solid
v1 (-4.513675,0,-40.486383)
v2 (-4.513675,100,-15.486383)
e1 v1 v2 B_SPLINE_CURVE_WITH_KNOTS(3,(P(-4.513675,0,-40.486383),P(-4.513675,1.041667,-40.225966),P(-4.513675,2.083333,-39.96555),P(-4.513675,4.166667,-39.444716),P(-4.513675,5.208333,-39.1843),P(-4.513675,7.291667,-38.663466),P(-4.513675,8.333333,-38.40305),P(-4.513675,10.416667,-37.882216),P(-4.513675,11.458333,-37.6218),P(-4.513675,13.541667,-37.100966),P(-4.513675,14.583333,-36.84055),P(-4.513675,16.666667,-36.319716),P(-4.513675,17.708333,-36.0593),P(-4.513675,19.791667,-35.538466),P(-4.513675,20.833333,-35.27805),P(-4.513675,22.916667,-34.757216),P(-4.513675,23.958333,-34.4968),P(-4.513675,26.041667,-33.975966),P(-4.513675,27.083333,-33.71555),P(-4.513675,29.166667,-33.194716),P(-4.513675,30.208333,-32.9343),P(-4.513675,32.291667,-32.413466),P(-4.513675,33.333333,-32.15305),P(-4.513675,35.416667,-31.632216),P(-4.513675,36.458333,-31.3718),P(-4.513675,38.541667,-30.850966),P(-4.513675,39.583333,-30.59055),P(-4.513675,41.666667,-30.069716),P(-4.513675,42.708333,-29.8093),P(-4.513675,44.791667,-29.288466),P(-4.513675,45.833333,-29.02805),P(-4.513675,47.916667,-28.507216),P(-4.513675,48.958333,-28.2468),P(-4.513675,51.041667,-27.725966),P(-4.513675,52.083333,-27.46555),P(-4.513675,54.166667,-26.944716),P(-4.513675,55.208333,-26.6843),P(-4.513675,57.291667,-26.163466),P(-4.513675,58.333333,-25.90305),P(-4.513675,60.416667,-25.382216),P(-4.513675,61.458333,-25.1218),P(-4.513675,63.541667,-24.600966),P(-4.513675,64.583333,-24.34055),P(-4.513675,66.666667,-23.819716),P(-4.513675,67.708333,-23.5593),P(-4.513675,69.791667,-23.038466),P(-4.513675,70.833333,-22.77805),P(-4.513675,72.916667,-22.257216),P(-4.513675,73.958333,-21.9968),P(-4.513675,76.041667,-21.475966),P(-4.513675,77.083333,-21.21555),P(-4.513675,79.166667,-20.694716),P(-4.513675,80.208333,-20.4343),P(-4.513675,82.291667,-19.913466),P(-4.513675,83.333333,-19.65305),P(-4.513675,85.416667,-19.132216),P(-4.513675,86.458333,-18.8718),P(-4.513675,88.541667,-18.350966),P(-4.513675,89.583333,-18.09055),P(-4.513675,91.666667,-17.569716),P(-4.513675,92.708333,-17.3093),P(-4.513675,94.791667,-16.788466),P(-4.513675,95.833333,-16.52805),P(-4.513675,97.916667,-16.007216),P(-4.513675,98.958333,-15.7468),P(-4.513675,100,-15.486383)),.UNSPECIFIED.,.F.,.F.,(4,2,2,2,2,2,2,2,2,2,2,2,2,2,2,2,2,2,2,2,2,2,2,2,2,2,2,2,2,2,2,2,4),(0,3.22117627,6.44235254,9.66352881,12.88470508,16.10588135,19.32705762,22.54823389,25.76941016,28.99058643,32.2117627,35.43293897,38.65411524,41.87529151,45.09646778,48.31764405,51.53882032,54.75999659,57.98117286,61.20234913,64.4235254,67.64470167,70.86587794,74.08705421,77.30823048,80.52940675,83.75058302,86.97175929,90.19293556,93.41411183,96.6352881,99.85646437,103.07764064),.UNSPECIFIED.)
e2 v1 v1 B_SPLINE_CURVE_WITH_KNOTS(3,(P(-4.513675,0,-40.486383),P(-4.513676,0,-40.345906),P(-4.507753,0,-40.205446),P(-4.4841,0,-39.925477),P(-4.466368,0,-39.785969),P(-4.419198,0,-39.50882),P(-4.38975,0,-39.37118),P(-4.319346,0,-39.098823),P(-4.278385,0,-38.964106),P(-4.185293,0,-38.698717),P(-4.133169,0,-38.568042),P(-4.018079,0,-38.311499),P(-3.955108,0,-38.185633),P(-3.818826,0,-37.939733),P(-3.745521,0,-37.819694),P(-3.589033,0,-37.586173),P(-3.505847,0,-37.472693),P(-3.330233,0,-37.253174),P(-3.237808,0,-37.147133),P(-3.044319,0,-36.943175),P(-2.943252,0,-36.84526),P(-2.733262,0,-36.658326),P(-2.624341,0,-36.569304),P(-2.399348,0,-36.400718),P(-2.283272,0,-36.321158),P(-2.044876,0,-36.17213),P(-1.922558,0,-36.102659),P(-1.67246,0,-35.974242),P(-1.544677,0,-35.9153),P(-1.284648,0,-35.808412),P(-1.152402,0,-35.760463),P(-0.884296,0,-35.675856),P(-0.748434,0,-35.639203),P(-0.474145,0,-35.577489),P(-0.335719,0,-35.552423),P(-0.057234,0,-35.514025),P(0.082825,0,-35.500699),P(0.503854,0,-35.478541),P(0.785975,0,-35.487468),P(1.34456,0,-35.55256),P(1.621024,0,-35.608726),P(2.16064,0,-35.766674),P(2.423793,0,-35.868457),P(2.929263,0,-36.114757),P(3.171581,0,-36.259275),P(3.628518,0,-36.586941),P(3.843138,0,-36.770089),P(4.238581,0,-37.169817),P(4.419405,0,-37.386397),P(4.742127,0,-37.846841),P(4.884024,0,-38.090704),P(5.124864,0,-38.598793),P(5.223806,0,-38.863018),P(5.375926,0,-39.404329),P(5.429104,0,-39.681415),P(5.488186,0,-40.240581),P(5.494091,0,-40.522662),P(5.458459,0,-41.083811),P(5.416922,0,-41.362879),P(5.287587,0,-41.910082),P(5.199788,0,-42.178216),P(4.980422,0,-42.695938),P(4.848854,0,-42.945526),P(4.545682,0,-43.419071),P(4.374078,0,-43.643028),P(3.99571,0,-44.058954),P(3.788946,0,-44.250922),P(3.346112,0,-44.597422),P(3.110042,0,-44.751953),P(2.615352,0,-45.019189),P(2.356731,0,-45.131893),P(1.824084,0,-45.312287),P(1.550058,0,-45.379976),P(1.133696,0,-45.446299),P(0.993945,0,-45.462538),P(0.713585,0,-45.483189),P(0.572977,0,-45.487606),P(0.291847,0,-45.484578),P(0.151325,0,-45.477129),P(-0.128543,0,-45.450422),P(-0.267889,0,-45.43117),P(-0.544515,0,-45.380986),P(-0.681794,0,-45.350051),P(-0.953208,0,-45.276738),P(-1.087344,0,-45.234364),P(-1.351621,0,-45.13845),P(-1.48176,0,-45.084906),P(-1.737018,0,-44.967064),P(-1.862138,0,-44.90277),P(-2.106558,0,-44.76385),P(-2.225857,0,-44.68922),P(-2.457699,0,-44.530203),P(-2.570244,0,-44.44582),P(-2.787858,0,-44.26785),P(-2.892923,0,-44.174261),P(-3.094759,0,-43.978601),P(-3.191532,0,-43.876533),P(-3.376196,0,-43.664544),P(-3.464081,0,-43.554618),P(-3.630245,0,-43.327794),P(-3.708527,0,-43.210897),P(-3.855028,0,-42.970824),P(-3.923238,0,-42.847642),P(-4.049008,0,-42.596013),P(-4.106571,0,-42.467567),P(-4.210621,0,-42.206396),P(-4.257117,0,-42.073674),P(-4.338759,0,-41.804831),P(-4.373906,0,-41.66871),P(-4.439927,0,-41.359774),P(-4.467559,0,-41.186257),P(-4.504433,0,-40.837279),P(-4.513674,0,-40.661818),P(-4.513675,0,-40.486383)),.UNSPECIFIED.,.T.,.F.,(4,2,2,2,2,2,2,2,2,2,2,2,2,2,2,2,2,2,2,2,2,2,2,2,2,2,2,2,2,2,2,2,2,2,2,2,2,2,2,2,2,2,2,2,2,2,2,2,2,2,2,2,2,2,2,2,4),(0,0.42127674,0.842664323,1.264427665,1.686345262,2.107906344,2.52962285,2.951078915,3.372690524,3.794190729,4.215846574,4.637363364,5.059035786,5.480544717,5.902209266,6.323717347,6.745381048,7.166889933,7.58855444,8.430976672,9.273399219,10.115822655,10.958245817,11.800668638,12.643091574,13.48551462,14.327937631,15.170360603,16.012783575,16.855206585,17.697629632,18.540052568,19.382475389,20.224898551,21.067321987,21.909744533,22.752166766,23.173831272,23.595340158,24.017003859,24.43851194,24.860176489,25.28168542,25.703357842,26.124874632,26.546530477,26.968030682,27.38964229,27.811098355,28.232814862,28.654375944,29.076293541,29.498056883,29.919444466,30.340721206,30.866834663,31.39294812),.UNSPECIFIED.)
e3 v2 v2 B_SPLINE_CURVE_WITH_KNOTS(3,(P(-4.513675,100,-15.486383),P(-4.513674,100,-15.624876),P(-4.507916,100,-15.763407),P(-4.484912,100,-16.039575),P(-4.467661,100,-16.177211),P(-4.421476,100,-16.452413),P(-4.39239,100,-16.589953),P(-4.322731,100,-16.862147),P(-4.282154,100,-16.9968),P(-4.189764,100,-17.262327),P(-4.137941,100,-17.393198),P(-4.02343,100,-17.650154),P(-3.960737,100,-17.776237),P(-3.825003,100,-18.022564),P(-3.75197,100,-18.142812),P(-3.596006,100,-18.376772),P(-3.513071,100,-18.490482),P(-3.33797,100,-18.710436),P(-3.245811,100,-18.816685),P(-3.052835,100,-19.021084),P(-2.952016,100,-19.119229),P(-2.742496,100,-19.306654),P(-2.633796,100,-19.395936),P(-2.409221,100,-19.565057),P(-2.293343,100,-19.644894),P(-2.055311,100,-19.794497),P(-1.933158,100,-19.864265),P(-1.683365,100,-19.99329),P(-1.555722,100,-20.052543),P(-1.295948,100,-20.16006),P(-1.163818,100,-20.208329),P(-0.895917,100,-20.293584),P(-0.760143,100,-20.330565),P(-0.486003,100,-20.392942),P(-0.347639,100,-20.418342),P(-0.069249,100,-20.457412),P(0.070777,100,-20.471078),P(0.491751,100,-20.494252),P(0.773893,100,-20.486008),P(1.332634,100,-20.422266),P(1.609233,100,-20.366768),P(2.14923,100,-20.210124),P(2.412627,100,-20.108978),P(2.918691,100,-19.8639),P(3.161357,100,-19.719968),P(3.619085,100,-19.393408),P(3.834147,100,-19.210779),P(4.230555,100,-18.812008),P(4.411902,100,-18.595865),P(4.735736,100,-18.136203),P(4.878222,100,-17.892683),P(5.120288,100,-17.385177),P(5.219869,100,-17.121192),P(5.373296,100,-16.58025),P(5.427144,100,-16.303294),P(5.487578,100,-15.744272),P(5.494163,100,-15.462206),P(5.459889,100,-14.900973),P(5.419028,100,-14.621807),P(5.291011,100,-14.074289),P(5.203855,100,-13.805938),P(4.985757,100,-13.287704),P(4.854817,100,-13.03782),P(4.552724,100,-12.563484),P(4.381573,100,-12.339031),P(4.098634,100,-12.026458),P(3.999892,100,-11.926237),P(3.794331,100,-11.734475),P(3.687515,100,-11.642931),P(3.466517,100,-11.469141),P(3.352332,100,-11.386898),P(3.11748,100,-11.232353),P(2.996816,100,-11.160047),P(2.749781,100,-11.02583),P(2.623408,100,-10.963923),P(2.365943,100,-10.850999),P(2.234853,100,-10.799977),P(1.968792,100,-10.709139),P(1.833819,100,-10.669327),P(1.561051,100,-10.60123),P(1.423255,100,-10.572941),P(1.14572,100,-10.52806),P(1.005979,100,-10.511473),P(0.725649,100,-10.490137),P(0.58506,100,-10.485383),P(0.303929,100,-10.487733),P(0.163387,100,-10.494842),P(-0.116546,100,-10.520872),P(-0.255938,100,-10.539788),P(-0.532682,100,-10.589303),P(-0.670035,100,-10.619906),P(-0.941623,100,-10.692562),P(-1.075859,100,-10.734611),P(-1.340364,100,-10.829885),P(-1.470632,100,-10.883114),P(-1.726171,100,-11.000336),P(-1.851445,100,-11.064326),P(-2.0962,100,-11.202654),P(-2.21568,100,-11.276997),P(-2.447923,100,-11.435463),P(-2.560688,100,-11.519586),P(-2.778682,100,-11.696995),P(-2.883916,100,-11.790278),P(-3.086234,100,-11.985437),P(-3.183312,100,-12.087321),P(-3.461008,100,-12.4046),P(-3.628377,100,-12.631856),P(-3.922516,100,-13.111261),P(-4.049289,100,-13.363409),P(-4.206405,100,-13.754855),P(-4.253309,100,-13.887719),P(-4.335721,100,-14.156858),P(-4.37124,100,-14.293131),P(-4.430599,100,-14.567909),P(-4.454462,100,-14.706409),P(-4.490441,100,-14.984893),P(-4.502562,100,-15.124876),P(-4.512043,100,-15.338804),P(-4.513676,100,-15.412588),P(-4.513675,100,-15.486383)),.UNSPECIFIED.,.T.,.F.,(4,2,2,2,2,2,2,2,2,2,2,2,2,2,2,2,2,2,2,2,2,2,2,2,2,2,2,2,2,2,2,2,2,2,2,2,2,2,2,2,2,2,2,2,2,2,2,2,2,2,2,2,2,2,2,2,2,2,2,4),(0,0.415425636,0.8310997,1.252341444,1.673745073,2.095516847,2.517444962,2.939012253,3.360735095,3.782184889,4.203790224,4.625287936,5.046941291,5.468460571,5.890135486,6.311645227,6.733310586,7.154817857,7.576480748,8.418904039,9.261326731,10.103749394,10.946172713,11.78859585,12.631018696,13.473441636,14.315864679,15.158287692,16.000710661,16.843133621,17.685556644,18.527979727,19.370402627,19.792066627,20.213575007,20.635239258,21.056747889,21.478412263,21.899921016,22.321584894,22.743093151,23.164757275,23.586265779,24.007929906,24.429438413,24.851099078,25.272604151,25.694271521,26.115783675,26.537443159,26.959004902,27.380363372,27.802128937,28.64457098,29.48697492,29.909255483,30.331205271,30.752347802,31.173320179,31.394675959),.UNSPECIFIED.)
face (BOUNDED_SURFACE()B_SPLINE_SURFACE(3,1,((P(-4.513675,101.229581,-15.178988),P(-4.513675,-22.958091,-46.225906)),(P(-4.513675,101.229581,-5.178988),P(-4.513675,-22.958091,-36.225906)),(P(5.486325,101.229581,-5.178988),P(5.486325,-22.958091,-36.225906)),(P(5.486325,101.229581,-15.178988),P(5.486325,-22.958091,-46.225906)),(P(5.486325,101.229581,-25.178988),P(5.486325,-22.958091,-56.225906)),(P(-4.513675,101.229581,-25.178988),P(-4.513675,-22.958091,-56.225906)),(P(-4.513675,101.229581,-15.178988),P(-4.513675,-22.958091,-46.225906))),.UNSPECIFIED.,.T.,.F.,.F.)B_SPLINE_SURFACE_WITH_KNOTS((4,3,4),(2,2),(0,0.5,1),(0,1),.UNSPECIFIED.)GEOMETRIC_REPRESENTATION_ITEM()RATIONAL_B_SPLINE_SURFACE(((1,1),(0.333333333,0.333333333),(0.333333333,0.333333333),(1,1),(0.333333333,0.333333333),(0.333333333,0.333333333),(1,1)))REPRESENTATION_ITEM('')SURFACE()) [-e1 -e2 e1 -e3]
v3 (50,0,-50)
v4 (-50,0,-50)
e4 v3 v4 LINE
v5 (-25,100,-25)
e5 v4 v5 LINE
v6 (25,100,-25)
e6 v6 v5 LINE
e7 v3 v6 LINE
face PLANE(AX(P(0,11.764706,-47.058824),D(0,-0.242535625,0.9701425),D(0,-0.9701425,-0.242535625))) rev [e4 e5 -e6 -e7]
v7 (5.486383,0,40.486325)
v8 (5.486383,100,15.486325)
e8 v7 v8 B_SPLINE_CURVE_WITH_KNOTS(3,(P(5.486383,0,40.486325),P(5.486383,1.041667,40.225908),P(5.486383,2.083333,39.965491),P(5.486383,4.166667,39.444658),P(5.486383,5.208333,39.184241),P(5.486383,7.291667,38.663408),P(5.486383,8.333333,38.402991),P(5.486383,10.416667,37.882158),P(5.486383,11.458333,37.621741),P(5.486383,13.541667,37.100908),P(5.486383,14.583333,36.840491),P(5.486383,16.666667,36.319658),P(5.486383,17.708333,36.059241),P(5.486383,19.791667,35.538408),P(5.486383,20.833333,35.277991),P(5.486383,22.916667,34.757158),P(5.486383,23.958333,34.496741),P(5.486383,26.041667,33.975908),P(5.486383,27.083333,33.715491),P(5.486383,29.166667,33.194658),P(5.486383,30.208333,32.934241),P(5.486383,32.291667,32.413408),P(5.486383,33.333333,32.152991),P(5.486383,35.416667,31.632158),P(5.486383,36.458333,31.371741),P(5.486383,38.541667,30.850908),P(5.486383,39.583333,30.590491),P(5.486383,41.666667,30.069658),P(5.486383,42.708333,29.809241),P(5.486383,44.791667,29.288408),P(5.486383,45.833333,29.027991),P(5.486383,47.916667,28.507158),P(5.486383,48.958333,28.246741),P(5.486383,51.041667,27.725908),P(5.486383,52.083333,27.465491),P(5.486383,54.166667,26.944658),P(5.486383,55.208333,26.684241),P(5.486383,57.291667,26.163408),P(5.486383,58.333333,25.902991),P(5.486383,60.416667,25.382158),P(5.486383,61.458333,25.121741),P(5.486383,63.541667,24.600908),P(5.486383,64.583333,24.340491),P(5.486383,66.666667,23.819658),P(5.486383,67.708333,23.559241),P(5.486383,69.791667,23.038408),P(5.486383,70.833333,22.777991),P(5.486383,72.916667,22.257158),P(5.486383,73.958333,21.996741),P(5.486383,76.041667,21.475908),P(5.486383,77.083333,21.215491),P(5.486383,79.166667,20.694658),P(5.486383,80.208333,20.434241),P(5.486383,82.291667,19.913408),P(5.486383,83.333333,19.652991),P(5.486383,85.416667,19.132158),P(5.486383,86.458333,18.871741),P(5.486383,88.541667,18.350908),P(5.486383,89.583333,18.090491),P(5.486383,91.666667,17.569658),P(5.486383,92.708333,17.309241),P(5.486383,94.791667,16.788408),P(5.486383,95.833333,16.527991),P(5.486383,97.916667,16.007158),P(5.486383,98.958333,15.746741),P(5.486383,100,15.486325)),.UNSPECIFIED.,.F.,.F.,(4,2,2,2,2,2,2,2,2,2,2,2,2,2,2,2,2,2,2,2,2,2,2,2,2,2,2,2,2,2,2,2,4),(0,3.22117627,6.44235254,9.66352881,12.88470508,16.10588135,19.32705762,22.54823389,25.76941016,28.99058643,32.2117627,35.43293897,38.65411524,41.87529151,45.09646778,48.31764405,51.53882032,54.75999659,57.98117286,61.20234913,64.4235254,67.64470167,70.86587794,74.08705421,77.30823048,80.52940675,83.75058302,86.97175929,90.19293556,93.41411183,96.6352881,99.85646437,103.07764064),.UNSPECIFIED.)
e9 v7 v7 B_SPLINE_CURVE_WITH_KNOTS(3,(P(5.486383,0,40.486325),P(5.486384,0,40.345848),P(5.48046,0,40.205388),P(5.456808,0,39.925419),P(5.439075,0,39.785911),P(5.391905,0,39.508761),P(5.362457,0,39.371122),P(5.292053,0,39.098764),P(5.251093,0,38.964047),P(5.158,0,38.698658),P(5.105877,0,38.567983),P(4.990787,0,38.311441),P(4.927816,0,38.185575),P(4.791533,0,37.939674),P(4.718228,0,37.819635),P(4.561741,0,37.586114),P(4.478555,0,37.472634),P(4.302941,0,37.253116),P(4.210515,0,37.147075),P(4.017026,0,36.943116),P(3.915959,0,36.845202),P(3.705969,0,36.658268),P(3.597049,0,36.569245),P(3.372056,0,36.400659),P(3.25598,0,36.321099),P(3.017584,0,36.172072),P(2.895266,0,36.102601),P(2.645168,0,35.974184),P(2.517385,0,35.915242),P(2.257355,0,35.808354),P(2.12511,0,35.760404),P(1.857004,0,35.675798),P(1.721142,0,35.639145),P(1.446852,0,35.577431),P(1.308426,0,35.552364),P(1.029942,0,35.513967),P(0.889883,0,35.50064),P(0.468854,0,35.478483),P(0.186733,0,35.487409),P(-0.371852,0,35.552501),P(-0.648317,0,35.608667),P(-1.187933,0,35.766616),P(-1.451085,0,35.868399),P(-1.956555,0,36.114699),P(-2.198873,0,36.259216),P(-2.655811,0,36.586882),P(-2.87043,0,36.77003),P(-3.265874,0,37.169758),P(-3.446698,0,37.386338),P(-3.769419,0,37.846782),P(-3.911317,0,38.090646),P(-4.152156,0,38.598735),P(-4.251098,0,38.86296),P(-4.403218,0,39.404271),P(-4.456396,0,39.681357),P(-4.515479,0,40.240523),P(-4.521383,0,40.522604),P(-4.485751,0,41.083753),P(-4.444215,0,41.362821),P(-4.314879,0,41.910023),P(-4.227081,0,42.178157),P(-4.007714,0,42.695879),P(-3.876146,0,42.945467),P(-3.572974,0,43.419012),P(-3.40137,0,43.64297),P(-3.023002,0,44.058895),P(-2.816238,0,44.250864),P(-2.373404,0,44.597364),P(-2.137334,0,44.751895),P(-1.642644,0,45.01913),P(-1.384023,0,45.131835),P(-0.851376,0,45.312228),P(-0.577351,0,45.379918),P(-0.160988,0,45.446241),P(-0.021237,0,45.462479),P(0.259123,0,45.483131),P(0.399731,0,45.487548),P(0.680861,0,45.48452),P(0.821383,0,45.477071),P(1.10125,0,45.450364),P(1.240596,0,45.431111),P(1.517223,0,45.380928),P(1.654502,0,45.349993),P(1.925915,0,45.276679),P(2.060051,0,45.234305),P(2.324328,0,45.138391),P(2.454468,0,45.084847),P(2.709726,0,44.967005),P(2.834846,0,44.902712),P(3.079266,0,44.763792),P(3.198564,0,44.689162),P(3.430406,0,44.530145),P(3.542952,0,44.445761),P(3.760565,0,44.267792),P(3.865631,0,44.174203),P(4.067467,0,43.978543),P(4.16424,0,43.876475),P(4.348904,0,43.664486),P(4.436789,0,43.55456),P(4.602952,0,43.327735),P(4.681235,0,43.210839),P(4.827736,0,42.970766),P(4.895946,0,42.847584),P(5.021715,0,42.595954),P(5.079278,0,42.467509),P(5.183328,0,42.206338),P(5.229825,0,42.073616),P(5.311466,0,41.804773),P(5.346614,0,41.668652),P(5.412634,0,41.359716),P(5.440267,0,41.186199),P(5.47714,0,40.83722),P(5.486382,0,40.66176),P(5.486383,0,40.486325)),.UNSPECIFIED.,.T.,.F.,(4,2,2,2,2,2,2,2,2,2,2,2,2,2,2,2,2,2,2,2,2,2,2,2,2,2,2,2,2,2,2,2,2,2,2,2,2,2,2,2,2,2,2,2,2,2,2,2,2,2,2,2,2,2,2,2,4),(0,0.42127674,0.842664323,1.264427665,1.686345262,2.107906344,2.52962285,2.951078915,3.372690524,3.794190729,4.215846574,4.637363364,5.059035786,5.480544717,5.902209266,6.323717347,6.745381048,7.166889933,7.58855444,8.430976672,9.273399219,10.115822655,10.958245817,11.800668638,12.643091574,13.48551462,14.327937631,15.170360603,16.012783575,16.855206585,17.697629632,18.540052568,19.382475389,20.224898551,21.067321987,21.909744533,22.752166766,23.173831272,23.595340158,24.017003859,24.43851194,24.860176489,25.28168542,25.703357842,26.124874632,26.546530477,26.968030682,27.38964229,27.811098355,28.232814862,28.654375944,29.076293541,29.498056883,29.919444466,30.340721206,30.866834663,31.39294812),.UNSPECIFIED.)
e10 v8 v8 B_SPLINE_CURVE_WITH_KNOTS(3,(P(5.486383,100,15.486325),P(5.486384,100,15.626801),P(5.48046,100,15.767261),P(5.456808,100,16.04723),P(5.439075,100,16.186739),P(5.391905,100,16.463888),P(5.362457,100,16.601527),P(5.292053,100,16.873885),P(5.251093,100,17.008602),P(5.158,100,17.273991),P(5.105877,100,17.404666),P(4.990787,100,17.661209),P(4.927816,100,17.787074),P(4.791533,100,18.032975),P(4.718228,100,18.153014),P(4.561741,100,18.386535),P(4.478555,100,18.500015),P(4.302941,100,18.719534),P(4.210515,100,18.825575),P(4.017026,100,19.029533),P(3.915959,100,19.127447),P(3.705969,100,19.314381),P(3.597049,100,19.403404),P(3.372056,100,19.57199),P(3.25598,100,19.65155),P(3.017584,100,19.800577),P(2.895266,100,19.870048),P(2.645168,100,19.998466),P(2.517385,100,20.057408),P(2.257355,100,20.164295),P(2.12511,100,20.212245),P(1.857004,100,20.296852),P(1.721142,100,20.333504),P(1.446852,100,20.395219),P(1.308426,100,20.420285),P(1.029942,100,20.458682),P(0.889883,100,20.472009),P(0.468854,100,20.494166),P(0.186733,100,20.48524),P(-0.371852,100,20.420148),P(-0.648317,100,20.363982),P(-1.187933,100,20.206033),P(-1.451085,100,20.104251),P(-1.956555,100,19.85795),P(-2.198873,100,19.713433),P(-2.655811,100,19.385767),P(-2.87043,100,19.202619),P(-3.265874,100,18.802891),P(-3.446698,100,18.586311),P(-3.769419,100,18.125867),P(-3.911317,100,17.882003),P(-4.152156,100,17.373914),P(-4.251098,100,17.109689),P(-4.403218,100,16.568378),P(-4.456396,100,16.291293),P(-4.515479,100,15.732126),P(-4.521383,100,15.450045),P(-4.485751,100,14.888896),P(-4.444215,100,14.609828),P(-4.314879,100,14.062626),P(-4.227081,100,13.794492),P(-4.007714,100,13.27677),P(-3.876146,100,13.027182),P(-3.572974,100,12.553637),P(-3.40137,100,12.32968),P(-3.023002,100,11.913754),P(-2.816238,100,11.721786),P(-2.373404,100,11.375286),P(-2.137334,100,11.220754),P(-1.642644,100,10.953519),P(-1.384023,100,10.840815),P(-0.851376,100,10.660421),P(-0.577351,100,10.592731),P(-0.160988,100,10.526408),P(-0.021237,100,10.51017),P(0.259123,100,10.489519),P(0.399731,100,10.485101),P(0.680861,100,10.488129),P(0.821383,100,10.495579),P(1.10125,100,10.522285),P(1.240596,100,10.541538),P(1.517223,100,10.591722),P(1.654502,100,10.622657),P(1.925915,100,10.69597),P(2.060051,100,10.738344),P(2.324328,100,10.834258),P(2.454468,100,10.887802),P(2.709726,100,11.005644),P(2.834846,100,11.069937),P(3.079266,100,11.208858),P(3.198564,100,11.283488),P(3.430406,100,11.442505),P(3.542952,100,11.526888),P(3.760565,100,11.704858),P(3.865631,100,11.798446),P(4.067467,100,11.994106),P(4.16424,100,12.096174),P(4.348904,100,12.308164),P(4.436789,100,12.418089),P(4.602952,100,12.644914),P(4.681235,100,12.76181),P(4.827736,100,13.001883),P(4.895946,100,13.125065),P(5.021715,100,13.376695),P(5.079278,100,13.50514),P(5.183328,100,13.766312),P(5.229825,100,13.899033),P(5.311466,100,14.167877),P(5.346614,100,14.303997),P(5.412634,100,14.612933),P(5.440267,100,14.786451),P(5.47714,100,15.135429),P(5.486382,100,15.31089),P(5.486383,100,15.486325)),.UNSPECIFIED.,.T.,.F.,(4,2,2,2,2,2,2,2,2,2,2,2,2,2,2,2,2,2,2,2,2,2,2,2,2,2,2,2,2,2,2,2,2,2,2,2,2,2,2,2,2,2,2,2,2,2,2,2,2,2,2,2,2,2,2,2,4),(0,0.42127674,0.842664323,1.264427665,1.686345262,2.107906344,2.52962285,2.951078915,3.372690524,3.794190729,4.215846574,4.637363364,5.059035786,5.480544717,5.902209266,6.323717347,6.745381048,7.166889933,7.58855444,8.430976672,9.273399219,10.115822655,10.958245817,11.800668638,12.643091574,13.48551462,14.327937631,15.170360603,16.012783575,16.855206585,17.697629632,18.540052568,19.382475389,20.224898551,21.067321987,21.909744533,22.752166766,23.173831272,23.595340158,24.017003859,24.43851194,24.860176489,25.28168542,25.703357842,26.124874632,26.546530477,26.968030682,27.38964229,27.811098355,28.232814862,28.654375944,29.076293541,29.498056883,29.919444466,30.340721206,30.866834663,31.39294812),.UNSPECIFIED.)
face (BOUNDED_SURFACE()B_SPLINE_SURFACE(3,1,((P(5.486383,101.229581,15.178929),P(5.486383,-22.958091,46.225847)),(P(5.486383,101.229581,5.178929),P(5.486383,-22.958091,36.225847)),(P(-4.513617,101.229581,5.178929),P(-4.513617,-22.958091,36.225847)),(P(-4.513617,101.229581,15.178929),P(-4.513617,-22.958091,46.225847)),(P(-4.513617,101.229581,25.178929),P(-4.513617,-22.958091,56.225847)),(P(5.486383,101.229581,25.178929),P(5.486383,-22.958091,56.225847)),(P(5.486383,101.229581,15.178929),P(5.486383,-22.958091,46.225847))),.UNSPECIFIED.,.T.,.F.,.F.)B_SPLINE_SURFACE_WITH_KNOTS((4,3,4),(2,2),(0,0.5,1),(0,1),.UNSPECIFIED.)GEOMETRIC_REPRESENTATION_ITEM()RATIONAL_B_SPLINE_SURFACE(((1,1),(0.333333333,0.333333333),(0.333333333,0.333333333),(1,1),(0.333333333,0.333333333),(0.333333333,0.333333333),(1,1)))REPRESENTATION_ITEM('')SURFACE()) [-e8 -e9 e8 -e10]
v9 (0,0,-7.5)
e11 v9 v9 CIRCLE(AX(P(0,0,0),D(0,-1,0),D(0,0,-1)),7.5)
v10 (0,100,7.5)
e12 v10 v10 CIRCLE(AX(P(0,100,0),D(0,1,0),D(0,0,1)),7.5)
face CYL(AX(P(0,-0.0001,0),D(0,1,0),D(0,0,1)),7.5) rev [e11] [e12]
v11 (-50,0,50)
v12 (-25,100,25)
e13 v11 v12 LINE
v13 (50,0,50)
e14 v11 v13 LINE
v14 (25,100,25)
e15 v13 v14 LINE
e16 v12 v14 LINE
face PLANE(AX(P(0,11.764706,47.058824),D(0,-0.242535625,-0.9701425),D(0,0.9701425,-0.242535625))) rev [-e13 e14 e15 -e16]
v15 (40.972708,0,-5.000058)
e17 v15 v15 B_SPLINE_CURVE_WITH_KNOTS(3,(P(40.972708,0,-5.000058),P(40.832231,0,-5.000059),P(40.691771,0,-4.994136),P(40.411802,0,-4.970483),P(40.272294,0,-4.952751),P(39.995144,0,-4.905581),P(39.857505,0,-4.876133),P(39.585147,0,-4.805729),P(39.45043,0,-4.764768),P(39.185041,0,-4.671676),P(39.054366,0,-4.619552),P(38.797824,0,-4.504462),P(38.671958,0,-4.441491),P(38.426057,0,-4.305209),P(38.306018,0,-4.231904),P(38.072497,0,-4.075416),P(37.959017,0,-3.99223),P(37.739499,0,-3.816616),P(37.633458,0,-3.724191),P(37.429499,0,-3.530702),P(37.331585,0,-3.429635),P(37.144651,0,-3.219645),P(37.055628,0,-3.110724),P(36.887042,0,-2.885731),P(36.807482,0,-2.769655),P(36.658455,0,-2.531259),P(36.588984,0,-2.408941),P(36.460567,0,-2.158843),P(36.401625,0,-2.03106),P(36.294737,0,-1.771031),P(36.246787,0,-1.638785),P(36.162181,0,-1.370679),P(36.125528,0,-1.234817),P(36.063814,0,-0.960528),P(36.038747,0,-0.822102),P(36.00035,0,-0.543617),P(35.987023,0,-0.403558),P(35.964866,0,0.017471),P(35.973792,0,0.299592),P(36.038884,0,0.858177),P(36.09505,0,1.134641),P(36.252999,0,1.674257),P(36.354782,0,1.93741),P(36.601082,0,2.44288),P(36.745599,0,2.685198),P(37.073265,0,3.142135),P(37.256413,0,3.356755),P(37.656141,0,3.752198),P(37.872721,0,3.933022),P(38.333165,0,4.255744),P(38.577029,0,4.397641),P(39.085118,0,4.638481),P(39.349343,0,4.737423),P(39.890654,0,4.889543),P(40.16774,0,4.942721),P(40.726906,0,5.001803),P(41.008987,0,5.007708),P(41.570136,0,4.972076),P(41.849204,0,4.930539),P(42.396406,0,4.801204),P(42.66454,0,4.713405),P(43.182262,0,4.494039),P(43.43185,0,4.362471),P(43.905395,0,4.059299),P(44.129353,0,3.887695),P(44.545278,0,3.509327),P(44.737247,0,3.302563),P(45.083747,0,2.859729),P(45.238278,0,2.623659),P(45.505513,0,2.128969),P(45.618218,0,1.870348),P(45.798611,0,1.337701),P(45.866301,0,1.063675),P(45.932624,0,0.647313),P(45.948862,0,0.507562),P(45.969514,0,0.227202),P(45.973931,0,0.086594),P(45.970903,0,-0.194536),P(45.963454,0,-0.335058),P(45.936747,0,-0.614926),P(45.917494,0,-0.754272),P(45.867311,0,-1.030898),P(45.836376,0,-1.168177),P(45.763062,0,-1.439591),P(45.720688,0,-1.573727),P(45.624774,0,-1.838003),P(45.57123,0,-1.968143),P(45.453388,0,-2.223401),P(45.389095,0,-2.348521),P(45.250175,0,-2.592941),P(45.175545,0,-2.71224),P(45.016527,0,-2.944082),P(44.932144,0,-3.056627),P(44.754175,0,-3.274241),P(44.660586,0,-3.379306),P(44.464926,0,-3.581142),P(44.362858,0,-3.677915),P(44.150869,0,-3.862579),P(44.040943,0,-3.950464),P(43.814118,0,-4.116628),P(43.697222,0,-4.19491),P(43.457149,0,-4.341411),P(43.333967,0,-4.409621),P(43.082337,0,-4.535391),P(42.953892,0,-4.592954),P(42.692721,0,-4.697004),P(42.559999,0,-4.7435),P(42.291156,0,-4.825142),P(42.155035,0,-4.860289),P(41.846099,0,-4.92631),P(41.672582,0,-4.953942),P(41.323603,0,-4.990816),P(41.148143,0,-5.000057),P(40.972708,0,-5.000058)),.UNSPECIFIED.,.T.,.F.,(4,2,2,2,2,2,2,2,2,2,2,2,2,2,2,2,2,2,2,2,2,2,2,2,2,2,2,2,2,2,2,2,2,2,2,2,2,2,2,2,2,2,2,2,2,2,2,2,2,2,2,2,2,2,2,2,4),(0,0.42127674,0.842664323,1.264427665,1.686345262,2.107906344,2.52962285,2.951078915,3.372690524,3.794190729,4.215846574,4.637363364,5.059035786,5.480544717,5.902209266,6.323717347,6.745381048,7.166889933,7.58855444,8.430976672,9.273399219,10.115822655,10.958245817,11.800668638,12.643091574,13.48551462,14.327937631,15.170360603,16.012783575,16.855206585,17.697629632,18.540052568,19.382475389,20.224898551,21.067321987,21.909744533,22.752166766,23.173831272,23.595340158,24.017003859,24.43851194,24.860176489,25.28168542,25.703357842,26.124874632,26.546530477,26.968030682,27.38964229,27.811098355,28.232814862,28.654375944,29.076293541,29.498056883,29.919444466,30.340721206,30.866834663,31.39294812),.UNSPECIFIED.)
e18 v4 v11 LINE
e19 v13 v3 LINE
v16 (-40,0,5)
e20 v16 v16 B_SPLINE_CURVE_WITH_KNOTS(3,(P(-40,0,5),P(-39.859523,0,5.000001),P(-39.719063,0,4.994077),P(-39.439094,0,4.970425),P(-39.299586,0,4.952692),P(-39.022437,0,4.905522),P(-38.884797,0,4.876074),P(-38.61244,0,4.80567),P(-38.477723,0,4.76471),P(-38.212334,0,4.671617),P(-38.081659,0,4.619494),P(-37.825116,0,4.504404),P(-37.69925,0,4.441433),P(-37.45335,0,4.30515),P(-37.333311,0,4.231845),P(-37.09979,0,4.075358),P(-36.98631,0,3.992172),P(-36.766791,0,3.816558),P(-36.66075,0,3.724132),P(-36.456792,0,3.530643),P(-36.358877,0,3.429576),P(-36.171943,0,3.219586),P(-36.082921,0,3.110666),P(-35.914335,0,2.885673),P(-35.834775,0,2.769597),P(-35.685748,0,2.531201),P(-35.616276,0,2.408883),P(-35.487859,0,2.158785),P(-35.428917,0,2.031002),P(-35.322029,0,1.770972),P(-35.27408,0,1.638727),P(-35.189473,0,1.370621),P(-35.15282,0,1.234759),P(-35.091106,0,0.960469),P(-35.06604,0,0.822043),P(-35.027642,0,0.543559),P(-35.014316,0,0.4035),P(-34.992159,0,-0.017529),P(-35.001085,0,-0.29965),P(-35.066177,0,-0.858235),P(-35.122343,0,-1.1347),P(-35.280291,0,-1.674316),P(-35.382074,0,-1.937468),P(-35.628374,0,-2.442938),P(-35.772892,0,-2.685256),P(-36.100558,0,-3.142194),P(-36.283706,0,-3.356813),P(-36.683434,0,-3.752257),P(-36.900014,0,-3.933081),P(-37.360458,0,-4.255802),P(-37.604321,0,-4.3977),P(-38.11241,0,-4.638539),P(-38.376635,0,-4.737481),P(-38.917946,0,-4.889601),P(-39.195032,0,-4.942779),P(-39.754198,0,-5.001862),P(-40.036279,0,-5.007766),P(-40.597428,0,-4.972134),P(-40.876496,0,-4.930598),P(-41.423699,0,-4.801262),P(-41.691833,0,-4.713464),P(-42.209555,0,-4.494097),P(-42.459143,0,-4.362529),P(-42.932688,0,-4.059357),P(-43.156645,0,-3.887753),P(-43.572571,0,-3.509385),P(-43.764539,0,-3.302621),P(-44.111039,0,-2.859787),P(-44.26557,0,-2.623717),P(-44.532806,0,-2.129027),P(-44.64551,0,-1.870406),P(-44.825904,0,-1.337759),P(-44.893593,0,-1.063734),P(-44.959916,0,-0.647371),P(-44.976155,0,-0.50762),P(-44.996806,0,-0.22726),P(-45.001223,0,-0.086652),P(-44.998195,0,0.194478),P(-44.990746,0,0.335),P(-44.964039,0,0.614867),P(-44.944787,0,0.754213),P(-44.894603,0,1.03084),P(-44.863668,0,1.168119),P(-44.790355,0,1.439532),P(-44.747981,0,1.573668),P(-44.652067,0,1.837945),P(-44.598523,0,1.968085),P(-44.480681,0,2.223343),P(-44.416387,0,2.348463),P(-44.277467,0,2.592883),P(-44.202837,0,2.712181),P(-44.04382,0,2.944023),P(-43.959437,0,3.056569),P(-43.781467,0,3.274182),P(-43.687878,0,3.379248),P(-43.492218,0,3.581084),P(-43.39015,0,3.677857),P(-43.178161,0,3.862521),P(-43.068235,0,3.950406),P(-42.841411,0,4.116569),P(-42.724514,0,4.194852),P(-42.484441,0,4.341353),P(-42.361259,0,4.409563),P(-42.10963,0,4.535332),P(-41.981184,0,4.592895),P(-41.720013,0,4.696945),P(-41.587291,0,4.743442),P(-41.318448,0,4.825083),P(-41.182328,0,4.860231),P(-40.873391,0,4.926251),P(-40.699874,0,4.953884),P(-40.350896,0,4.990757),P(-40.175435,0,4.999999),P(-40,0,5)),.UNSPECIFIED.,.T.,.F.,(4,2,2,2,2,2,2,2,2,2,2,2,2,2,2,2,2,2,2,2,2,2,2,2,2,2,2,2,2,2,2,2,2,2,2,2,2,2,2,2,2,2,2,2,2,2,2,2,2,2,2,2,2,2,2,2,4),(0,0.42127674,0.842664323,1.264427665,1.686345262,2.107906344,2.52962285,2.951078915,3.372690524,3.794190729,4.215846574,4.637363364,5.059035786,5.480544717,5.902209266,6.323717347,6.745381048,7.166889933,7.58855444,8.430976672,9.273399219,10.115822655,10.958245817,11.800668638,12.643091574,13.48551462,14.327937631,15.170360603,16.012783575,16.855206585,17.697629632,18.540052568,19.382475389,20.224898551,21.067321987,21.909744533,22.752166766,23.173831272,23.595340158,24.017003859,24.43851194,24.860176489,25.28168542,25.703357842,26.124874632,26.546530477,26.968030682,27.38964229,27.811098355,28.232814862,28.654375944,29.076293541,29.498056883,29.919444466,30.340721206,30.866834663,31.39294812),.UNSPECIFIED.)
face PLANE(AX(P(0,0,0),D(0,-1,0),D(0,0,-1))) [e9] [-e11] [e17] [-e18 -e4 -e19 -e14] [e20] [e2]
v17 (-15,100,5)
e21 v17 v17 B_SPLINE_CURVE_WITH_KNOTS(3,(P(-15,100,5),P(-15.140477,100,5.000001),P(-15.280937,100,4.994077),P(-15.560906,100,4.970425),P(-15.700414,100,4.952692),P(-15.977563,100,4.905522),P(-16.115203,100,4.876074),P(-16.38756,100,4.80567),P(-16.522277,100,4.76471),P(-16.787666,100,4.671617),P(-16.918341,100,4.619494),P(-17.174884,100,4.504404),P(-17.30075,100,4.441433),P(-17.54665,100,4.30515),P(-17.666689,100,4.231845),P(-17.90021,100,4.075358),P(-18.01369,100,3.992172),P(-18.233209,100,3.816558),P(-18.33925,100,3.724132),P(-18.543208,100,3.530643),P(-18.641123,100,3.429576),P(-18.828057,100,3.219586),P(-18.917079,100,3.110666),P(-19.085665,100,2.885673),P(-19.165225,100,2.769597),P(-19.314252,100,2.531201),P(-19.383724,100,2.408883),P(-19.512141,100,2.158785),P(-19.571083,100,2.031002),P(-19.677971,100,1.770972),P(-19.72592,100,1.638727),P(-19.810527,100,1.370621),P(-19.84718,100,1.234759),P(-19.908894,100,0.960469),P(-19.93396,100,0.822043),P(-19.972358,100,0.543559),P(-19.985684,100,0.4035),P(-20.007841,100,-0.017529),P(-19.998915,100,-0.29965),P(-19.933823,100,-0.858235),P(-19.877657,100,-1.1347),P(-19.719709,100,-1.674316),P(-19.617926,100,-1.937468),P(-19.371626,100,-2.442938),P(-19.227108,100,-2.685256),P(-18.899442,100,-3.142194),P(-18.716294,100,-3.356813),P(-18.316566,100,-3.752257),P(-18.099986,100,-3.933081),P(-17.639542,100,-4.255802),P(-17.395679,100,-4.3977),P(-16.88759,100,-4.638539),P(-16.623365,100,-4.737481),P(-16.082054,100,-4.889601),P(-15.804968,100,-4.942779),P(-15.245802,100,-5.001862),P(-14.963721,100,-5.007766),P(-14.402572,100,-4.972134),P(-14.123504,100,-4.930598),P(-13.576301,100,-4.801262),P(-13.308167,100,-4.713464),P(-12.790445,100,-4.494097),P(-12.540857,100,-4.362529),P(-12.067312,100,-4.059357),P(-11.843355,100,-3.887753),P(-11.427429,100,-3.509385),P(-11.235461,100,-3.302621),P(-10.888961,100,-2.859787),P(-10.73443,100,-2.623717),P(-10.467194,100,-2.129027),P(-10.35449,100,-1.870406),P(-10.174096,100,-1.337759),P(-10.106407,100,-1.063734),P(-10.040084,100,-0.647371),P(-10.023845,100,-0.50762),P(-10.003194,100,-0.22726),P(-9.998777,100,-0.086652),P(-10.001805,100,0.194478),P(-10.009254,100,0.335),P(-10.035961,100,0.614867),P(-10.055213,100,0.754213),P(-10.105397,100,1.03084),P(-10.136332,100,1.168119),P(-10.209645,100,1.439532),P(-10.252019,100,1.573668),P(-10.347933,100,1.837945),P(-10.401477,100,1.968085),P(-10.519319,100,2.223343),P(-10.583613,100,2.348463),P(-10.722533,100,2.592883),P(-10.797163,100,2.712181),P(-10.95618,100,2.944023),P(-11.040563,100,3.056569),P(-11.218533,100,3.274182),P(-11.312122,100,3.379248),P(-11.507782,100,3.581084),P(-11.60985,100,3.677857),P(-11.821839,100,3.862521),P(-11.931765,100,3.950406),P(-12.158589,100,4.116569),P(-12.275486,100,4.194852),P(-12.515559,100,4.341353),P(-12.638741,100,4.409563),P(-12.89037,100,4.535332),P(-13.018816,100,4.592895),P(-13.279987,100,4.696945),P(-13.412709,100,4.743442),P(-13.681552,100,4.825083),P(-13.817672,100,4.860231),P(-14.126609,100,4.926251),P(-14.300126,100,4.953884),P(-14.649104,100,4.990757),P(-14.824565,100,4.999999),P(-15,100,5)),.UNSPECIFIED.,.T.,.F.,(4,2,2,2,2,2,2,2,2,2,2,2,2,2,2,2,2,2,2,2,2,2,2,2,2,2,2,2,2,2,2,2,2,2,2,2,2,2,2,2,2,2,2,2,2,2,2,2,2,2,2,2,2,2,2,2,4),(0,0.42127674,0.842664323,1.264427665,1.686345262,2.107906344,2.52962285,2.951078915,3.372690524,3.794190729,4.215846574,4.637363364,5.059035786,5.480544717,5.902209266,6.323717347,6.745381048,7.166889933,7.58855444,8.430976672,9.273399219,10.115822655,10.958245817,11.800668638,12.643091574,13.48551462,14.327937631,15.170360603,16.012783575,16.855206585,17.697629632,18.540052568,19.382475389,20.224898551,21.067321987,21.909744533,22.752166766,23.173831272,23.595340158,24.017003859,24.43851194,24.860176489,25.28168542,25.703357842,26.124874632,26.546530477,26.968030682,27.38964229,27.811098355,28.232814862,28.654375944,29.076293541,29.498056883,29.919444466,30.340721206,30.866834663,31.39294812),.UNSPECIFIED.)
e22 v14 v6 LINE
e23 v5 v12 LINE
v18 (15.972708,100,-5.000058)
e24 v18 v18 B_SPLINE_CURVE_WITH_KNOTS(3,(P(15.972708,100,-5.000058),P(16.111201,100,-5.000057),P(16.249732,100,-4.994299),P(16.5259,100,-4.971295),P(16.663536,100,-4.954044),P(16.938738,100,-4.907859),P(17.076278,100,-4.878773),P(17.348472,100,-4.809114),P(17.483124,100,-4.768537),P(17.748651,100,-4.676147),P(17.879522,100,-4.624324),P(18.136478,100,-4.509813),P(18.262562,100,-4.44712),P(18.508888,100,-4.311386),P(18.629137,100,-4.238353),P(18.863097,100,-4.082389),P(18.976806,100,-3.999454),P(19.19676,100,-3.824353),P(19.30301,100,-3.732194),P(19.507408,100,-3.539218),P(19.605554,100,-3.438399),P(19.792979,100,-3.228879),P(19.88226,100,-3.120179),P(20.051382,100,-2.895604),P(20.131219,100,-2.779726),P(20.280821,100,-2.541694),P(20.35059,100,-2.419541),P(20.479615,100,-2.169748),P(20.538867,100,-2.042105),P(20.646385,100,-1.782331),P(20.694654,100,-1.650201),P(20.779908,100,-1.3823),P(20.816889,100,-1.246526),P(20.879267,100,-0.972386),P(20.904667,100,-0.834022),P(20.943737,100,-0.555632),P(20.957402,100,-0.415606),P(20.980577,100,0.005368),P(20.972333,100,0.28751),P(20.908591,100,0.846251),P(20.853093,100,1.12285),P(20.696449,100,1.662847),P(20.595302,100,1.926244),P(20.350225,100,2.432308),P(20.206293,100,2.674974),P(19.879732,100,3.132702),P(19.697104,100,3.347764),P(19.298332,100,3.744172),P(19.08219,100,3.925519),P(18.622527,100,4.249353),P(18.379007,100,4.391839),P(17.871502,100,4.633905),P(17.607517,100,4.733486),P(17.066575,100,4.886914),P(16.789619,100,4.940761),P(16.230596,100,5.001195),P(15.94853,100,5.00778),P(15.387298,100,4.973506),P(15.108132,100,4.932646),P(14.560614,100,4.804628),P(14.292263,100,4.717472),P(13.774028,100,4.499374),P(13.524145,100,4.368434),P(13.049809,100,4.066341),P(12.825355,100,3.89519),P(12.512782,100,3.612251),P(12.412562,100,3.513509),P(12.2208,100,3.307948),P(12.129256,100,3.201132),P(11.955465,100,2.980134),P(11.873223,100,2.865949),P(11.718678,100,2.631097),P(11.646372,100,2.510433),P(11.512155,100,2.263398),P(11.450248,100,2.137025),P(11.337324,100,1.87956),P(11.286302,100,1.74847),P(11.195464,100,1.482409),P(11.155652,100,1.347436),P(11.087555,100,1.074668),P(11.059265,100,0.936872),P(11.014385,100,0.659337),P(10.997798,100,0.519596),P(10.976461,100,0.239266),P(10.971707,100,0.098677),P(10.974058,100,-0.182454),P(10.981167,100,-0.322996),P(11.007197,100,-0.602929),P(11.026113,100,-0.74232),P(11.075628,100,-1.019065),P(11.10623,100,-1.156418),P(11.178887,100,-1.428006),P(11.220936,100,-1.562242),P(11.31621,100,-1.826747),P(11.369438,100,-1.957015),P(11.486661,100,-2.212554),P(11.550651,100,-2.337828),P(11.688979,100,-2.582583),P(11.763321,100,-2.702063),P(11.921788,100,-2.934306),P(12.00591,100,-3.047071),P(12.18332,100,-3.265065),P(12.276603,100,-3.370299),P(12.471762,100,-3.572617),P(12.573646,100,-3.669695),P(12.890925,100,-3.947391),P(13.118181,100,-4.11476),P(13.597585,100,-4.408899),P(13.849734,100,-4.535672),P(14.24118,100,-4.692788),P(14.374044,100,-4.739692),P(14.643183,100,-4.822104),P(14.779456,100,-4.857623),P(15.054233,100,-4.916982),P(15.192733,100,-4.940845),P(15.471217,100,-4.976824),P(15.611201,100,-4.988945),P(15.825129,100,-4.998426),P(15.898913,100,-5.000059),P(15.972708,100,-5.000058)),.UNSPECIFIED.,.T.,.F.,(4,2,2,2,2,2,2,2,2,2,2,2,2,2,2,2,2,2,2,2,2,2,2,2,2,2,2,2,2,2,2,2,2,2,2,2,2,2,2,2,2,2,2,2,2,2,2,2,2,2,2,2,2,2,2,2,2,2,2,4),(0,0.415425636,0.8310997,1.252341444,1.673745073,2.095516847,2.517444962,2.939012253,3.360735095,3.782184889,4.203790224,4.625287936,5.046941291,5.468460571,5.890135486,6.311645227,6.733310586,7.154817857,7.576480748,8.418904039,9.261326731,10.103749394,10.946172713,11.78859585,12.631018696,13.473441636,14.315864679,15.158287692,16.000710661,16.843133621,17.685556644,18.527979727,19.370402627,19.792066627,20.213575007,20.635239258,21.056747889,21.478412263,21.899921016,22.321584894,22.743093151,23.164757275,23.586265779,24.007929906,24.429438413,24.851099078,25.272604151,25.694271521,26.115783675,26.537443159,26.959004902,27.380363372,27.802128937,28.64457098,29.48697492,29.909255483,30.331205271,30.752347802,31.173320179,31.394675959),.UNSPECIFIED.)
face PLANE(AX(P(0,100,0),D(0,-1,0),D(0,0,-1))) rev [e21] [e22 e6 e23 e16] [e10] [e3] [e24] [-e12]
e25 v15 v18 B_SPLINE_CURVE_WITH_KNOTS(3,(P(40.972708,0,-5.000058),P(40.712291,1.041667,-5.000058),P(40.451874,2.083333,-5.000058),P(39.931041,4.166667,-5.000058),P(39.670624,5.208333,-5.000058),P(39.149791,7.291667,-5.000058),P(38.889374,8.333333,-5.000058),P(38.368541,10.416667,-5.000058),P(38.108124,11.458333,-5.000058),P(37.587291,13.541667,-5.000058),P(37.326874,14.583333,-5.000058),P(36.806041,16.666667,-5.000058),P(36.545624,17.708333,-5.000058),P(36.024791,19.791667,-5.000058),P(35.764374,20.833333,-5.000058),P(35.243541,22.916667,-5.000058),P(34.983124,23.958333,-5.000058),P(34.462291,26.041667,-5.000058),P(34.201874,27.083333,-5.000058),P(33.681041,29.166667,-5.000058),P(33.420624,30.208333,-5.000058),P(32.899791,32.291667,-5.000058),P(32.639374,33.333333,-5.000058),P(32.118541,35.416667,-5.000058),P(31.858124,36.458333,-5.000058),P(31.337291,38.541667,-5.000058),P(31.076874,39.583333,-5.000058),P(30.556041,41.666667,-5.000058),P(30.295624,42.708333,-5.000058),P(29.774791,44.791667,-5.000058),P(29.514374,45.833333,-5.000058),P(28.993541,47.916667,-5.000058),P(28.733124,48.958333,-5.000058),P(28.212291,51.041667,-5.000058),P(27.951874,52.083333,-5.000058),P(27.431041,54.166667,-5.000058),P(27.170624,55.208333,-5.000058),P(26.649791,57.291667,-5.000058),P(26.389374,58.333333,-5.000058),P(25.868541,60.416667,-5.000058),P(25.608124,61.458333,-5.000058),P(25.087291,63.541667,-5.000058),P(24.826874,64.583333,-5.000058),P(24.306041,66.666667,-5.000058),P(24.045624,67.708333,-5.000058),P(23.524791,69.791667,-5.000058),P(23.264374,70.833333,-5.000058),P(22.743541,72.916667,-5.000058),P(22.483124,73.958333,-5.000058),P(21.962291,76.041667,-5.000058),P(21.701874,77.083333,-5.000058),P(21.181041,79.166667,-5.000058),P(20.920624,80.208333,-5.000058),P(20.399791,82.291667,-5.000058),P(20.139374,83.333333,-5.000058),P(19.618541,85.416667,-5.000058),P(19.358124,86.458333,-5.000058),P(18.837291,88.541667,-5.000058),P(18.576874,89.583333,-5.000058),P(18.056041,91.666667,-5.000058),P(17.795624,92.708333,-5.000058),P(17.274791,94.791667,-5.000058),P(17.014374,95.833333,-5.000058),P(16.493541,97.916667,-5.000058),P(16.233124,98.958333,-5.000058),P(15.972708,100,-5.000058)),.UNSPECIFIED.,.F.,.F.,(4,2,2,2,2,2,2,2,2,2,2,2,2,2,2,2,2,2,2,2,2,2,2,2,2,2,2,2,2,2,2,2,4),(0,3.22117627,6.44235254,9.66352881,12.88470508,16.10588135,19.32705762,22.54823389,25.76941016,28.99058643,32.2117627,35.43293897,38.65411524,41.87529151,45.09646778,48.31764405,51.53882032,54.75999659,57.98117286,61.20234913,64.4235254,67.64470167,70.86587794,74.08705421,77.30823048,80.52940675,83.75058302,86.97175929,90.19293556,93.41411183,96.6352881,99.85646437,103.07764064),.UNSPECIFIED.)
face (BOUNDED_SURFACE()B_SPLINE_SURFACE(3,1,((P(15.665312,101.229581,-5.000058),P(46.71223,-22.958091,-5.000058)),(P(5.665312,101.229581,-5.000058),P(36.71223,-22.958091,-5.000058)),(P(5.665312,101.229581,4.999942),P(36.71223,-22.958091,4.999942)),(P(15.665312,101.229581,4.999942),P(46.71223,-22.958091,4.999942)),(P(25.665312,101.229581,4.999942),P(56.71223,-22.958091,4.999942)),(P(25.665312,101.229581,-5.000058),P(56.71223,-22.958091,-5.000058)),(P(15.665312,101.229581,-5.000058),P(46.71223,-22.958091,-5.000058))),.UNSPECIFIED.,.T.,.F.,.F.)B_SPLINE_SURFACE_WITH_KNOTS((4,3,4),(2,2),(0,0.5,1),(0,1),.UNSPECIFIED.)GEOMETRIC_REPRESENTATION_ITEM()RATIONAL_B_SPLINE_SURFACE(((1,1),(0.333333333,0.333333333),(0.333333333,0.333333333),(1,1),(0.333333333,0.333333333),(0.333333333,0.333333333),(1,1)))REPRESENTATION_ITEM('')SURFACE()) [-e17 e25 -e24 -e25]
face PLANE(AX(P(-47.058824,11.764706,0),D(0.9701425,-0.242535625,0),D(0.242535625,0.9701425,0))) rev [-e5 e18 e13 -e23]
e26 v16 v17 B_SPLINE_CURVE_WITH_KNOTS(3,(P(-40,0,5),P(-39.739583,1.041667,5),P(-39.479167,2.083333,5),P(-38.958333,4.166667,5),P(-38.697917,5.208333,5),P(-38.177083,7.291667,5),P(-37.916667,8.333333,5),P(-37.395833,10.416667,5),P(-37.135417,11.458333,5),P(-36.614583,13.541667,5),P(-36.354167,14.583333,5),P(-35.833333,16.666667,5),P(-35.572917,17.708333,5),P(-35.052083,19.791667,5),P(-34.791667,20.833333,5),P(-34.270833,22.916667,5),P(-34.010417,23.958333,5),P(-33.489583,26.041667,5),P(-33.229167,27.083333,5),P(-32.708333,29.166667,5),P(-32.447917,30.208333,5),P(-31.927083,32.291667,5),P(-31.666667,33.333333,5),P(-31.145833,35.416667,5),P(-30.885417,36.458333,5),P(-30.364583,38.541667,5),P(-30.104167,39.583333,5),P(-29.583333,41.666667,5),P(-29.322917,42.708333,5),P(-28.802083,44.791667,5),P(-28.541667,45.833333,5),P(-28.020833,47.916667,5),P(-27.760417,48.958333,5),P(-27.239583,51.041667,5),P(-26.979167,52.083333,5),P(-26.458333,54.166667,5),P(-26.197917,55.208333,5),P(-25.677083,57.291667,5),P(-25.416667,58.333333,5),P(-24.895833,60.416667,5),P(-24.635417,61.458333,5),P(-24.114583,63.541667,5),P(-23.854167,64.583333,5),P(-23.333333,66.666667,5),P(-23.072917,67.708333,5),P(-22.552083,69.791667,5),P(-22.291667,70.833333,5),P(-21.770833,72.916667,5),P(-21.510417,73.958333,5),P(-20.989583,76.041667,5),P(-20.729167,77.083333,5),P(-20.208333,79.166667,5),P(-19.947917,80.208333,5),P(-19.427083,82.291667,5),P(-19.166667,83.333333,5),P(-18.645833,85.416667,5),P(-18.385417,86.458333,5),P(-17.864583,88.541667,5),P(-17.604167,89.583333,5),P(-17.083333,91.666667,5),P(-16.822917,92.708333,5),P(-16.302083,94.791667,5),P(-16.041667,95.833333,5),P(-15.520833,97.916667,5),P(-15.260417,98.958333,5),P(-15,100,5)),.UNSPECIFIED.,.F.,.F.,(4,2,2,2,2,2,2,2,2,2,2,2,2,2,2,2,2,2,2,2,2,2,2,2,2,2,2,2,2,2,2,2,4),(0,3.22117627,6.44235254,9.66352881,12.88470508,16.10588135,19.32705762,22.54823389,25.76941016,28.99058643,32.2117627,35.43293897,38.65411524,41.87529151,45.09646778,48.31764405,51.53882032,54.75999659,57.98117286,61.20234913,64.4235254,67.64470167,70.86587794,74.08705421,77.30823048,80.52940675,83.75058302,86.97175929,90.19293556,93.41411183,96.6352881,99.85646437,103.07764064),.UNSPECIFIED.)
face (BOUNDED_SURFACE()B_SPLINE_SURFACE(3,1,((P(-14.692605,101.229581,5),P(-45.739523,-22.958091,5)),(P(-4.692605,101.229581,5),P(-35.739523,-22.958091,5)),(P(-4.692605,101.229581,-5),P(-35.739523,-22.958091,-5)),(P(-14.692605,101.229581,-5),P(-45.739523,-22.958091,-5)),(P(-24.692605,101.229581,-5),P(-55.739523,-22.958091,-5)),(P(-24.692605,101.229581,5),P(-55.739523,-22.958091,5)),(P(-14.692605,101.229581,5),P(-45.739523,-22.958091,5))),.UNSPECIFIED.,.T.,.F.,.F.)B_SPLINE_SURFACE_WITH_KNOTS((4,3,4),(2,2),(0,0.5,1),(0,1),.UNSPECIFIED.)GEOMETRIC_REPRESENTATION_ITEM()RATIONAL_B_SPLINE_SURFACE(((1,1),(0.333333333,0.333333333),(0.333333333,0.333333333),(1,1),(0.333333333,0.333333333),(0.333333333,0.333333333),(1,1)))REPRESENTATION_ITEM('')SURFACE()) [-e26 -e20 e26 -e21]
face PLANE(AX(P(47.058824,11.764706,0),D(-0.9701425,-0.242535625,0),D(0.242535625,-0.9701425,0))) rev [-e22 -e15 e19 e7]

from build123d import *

# Parameters (mm, degrees)
SKETCH4_R           = 5
CIRPATTERN2_START   = -11.032054127
CIRPATTERN2_DEPTH   = 105.5029968
CIRPATTERN2_START_2 = -94.352977596
CIRPATTERN2_2_DEPTH = 105.502996925
CIRPATTERN2_START_3 = -11.032068283
CIRPATTERN2_3_DEPTH = 105.502996925
SKETCH9_R           = 7.5
CUT_EXTRUDE1_DEPTH  = 123.474487302


# Read off the part's stored shape, not the designer's step: CirPattern2
with BuildPart() as part:
    # Sketch1 → Loft1 section 0
    with BuildSketch(Plane(origin=(0, 0, 0), x_dir=(1, 0, 0), z_dir=(0, 1, 0))):
        with BuildLine():
            Line((-50, -50), (50, -50))
            Line((50, -50), (50, 50))
            Line((50, 50), (-50, 50))
            Line((-50, 50), (-50, -50))
        make_face()
    # Sketch2 → Loft1 section 1
    with BuildSketch(Plane(origin=(0, 100, 0), x_dir=(1, 0, 0), z_dir=(0, 1, 0))):
        with BuildLine():
            Line((-25, -25), (25, -25))
            Line((25, -25), (25, 25))
            Line((25, 25), (-25, 25))
            Line((-25, 25), (-25, -25))
        make_face()
    loft()

    # Cut-Sweep1: sweep along a path in Sketch6
    with BuildLine(Plane(origin=(-37.647058824, 9.411764706, 0), x_dir=(0, 0, 1), z_dir=(-0.9701425001453319, 0.24253562503633289, 0))) as cut_sweep1_path:
        Line((0, 93.376215639), (0, -33.366083353))
    # Sketch4 → Cut-Sweep1 (sweep, cut)
    with BuildSketch(Plane(origin=(0, 100, 0), x_dir=(1, 0, 0), z_dir=(0, 1, 0))):
        with Locations((-15, 0)):
            Circle(SKETCH4_R)
    sweep(path=cut_sweep1_path.line, mode=Mode.SUBTRACT)

    # CirPattern2 outline → CirPattern2 (cut)
    with BuildSketch(Plane(origin=(0, 0, 0), x_dir=(1, 0, 0), z_dir=(0, 0.970142500145332, -0.2425356250363331)).offset(CIRPATTERN2_START)):
        with BuildLine():
            add(Edge.make_bspline(
                [(5.486382989, -39.277504189), (5.486382989, -29.576079188), (-4.513617011, -29.576079188), (-4.513617011, -39.277504189), (-4.513617011, -48.97892919), (5.486382989, -48.97892919), (5.486382989, -39.277504189)],
                knots=[0, 0, 0, 0, 0.5, 0.5, 0.5, 1, 1, 1, 1], degree=3, weights=[1, 0.333333333, 0.333333333, 1, 0.333333333, 0.333333333, 1]))
        make_face()
    extrude(amount=CIRPATTERN2_DEPTH, mode=Mode.SUBTRACT)

    # CirPattern2 2 outline → CirPattern2 2 (cut)
    with BuildSketch(Plane(origin=(0, 0, 0), x_dir=(0.9701425001453318, 0.24253562503633344, 0), z_dir=(0.24253562503633344, -0.9701425001453318, 0)).offset(CIRPATTERN2_START_2)):
        with BuildLine():
            add(Edge.make_bspline(
                [(39.749364998, -5.000058368), (30.047939997, -5.000058368), (30.047939997, 4.999941632), (39.749364998, 4.999941632), (49.450789999, 4.999941632), (49.450789999, -5.000058368), (39.749364998, -5.000058368)],
                knots=[0, 0, 0, 0, 0.5, 0.5, 0.5, 1, 1, 1, 1], degree=3, weights=[1, 0.333333333, 0.333333333, 1, 0.333333333, 0.333333333, 1]))
        make_face()
    extrude(amount=CIRPATTERN2_2_DEPTH, mode=Mode.SUBTRACT)

    # CirPattern2 3 outline → CirPattern2 3 (cut)
    with BuildSketch(Plane(origin=(0, 0, 0), x_dir=(1, 0, 0), z_dir=(0, 0.9701425001453319, 0.24253562503633325)).offset(CIRPATTERN2_START_3)):
        with BuildLine():
            add(Edge.make_bspline(
                [(-4.513675379, 39.277560815), (-4.513675379, 29.576135813), (5.486324621, 29.576135813), (5.486324621, 39.277560815), (5.486324621, 48.978985816), (-4.513675379, 48.978985816), (-4.513675379, 39.277560815)],
                knots=[0, 0, 0, 0, 0.5, 0.5, 0.5, 1, 1, 1, 1], degree=3, weights=[1, 0.333333333, 0.333333333, 1, 0.333333333, 0.333333333, 1]))
        make_face()
    extrude(amount=CIRPATTERN2_3_DEPTH, mode=Mode.SUBTRACT)

    # Sketch9 → Cut-Extrude1 (cut, through all)
    with BuildSketch(Plane(origin=(0, 100, 0), x_dir=(1, 0, 0), z_dir=(0, 1, 0))):
        with Locations(Location((0, 0, 0), (0, 0, 270))):
            Circle(SKETCH9_R)
    extrude(amount=-CUT_EXTRUDE1_DEPTH, mode=Mode.SUBTRACT)


solid = part.part
